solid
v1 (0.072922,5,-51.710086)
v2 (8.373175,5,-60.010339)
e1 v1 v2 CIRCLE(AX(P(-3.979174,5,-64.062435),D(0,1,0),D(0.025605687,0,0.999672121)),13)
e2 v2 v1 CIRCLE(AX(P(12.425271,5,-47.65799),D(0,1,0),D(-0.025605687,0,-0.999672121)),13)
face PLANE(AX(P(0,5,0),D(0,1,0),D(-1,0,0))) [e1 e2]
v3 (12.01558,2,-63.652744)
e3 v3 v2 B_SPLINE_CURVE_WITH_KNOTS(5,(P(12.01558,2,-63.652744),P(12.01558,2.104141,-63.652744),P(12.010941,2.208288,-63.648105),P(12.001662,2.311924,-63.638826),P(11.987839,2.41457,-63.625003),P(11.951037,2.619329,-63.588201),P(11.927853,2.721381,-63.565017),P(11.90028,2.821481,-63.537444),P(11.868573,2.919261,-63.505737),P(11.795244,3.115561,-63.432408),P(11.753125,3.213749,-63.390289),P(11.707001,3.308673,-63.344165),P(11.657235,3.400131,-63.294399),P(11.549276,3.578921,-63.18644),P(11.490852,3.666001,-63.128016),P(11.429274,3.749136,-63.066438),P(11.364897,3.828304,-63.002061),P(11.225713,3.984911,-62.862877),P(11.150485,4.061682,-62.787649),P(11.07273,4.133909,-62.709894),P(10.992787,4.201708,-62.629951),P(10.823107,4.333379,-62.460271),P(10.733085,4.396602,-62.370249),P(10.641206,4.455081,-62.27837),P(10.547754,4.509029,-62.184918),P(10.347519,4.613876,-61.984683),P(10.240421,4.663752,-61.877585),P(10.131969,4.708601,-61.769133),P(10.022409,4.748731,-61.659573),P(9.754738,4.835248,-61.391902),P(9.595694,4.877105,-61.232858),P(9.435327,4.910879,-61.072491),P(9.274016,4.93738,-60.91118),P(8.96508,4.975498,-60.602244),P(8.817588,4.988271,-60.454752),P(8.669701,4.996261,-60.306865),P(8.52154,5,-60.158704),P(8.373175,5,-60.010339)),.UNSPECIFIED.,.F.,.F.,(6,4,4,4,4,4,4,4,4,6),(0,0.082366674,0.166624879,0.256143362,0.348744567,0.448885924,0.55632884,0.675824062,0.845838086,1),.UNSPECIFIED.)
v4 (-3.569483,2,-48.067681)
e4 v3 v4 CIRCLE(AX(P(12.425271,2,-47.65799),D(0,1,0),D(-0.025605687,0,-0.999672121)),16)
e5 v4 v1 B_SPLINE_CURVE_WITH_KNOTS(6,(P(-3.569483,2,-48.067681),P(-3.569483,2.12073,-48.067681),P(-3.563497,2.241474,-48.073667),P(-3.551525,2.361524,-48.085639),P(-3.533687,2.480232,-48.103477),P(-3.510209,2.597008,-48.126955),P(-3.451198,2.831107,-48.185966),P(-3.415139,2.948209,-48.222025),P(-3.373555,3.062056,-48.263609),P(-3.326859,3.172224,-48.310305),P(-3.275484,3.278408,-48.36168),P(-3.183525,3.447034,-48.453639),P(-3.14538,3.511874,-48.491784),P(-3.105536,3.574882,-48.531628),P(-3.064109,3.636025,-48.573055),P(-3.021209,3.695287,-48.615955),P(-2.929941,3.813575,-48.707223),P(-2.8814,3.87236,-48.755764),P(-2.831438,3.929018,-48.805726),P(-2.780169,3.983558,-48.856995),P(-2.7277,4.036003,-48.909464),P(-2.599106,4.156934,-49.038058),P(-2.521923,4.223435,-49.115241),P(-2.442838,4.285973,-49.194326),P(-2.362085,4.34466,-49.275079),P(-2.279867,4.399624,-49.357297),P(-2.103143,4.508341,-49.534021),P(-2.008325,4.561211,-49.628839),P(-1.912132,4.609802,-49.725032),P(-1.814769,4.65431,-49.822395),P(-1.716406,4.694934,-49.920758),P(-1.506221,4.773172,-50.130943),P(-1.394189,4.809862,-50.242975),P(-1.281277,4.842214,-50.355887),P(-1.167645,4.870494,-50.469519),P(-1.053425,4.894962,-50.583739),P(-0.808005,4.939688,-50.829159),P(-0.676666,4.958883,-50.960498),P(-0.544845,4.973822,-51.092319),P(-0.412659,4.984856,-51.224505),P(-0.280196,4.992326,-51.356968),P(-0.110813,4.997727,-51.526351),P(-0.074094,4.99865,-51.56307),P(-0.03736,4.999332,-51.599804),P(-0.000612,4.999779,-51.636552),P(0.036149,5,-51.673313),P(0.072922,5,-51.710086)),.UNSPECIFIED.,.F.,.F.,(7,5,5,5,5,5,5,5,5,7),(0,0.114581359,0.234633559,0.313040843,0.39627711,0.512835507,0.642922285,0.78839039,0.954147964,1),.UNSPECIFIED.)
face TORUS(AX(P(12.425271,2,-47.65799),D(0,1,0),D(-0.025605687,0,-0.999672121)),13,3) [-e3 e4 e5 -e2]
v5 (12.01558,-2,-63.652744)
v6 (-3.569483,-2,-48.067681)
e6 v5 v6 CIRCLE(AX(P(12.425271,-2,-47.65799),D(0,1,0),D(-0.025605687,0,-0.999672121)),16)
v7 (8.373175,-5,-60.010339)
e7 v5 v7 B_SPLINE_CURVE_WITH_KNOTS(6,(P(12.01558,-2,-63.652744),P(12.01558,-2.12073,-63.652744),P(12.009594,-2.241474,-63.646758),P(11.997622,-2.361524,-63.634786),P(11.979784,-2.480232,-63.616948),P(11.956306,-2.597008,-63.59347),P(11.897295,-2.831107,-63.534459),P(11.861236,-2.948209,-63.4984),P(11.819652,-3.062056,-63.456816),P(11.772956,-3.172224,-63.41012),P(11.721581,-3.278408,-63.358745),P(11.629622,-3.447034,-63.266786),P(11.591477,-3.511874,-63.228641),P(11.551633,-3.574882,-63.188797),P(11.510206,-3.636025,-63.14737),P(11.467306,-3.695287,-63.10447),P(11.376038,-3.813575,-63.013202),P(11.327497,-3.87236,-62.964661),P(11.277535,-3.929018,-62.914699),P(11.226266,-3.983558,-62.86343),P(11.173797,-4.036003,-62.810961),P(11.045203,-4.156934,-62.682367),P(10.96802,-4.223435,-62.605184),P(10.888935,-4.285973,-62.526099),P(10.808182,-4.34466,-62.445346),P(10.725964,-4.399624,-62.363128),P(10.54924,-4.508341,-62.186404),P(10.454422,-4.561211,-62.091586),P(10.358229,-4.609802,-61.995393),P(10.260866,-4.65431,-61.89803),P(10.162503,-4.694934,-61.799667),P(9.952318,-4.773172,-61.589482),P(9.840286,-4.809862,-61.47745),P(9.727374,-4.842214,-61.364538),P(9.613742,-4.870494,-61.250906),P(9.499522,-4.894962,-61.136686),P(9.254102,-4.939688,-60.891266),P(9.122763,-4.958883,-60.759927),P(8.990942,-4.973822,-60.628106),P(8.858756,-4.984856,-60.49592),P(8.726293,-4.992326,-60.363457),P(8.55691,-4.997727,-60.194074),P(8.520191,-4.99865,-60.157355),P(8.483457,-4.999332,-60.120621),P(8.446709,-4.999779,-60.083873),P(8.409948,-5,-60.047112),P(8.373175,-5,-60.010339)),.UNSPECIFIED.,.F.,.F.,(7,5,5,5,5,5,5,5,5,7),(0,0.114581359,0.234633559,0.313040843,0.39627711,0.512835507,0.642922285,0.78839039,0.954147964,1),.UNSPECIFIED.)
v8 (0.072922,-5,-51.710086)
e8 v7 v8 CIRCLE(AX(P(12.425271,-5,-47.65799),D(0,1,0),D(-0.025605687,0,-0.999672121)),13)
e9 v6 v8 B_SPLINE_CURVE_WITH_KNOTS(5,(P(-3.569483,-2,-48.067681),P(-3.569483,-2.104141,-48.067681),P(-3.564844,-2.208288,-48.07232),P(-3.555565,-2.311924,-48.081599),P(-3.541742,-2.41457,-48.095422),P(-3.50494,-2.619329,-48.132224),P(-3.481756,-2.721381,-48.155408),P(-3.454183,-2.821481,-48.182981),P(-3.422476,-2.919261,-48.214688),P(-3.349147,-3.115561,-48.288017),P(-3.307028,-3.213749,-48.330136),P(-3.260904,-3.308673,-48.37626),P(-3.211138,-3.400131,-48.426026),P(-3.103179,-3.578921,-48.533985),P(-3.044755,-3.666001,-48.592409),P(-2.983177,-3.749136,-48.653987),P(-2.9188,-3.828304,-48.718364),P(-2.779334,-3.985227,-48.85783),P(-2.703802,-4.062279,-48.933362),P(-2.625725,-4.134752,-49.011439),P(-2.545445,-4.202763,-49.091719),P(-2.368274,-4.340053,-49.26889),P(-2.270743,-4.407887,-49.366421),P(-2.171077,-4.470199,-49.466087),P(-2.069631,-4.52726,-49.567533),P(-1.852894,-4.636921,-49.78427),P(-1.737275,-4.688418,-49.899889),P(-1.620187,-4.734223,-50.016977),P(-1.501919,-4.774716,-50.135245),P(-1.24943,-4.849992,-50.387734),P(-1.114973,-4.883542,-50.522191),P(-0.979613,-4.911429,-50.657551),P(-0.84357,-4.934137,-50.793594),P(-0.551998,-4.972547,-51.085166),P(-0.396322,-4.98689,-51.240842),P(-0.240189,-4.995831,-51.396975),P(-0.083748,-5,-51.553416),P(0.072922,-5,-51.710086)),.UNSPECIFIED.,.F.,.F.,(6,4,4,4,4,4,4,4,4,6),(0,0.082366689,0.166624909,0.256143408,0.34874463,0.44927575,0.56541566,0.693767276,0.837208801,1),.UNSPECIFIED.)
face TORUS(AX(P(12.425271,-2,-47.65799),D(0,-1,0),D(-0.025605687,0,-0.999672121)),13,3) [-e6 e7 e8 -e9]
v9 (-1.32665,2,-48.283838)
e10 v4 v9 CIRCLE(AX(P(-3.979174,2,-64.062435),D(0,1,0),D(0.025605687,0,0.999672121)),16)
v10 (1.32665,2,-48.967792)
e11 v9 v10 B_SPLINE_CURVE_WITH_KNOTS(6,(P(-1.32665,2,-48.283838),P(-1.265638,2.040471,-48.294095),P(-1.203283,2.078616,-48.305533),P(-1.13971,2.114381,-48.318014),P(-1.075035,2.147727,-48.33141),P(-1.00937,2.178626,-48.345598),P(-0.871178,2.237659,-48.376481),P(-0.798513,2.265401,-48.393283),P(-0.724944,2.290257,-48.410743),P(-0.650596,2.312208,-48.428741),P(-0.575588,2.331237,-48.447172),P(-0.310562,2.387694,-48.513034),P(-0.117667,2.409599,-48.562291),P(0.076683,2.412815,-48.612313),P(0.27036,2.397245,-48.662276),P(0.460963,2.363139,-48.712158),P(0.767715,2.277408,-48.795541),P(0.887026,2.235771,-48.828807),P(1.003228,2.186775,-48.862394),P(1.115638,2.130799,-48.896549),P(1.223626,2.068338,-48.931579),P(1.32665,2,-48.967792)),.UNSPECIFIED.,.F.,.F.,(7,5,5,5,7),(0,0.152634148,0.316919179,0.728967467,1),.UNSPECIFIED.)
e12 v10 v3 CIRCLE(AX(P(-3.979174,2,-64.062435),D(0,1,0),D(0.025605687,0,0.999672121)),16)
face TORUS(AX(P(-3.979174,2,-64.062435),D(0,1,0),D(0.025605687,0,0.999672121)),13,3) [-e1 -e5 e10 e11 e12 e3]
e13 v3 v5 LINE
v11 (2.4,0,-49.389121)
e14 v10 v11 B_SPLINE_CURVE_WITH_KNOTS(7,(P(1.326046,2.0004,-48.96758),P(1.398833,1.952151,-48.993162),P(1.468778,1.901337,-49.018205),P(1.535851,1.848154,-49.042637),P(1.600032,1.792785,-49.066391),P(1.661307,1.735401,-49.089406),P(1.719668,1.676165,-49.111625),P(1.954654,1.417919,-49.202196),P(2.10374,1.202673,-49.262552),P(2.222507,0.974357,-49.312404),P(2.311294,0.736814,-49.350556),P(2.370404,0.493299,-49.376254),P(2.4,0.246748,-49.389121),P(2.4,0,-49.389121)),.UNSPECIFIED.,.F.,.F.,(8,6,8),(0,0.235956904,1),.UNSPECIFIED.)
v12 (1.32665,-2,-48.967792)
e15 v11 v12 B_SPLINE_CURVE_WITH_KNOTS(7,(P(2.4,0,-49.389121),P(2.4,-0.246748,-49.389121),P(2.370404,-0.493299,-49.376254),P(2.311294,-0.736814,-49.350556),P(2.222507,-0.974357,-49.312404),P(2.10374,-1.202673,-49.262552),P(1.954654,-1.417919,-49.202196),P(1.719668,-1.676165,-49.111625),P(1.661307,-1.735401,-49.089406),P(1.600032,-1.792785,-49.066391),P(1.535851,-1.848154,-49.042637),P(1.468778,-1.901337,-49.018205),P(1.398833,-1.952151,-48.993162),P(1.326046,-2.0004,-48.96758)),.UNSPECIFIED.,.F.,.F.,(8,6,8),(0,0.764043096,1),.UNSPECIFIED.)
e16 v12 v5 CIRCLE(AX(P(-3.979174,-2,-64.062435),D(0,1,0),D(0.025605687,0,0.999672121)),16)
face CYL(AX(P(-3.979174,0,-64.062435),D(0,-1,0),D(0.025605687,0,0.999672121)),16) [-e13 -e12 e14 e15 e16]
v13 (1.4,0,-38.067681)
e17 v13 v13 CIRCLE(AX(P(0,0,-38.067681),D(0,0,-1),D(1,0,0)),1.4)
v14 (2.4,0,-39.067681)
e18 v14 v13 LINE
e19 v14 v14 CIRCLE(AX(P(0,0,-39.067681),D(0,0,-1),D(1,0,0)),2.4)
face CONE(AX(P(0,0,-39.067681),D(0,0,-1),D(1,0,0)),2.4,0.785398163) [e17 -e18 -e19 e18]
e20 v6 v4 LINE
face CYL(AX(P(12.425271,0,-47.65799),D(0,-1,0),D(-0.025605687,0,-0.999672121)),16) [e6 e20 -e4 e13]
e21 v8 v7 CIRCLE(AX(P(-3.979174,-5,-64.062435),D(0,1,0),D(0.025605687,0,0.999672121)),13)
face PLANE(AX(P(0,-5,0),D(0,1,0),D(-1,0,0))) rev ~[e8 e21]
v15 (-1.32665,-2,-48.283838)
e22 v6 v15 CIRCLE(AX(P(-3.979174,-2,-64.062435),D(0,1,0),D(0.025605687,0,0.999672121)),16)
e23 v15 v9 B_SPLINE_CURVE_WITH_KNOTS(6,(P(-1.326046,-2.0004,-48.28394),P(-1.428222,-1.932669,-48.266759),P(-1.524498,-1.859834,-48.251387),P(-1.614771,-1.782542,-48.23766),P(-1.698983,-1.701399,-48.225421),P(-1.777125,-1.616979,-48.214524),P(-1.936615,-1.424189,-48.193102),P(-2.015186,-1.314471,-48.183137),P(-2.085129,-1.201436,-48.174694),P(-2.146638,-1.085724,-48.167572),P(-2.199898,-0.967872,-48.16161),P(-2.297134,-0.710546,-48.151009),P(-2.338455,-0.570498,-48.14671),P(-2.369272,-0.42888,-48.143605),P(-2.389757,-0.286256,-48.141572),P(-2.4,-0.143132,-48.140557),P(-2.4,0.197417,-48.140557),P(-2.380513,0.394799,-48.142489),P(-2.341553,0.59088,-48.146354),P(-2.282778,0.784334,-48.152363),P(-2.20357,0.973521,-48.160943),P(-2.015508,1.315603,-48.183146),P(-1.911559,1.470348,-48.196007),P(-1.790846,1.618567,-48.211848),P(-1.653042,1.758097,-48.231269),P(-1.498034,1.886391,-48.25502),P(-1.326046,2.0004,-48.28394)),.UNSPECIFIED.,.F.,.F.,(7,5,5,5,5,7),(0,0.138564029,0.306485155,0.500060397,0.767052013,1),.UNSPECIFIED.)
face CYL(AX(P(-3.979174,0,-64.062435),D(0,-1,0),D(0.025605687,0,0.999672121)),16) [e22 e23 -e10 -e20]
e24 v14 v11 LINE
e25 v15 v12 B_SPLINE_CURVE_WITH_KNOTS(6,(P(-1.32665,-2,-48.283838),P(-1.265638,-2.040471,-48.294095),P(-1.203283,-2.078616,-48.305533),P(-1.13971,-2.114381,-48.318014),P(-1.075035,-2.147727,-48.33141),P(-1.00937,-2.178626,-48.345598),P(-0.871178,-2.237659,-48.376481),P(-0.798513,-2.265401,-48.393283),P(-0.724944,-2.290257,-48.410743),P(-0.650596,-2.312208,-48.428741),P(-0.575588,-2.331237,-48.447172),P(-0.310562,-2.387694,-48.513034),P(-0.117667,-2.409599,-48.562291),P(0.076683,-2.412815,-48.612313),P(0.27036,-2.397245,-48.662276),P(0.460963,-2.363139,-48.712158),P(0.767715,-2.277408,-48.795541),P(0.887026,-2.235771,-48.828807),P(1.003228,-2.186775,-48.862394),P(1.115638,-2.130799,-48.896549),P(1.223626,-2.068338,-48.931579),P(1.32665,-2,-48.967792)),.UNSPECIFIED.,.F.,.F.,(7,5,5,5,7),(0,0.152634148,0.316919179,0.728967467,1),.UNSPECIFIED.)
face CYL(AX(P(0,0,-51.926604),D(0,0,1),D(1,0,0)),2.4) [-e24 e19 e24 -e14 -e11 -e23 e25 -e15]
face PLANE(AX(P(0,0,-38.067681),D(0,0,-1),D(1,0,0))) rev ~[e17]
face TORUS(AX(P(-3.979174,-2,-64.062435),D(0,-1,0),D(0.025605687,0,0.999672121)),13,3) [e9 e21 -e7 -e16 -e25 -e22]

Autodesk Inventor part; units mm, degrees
ref_plane "YZ Plane" through (0, 0, 0) normal (1, 0, 0) x (0, 1, 0)
ref_plane "XZ Plane" through (0, 0, 0) normal (0, 1, 0) x (-1, 0, 0)
ref_plane "XY Plane" through (0, 0, 0) normal (0, 0, 1) x (1, 0, 0)
sketch "Sketch2" plane through (0, 0, 0) normal (0, 1, 0) x (-1, 0, 0)
  line L0 (0, 0) -> (-15.380673, 0) construction
  line L1 (0, 12) -> (0, -86.646063) construction
  circle A0 centre (0, 0) radius 2
  circle A1 centre (-12, 0) radius 10
  circle A2 centre (-23.313708, -11.313708) radius 6
  circle A3 centre (-16, -32.062435) radius 16
  line L2 (-16, -48.062435) -> (0, -48.062435)
  line L3 (-12, 10) -> (0, 10)
  line L4 (-12, 0) -> (-23.313708, -11.313708)
  arc A4 (-19.562803, 6.542477) -> (-31.877188, -34.041046) centre (19.892258, -27.589553) ccw
  line L5 (0, 0) -> (15.380673, 0) construction
  circle A5 centre (0, 0) radius 2
  circle A6 centre (12, 0) radius 10
  circle A7 centre (23.313708, -11.313708) radius 6
  circle A8 centre (16, -32.062435) radius 16
  line L6 (16, -48.062435) -> (0, -48.062435)
  line L7 (12, 10) -> (0, 10)
  line L8 (12, 0) -> (23.313708, -11.313708)
  arc A9 (31.877188, -34.041046) -> (19.562803, 6.542477) centre (-19.892258, -27.589553) ccw
  arc A10 (10.751933, -47.177256) -> (0, -45.834116) centre (2.223823, -71.738838) ccw
  arc A11 (0, 6.931712) -> (7.2, 8.772685) centre (0, 21.931712) ccw
  arc A12 (0, -45.834116) -> (-10.751933, -47.177256) centre (-2.223823, -71.738838) ccw
  arc A13 (-7.2, 8.772685) -> (0, 6.931712) centre (0, 21.931712) ccw
  line L9 (-23.313708, -11.313708) -> (-58.366086, -46.366086)
  line L10 (-12, 0) -> (-38.351414, 26.351414)
  line L11 (10.154637, -70.237898) -> (-38.67512, -21.408141)
  circle A14 centre (-36.041631, -24.041631) radius 16
  circle A15 centre (-12.425271, -47.65799) radius 16
  circle A16 centre (3.979174, -64.062435) radius 16
  line L12 (0, 10) -> (0, -48.062435)
  point P0 (3.569483, -48.067681)
  point P1 (-12.01558, -63.652744)
  point P2 (-7.2, 8.772685)
  point P3 (-29.089266, -9.631057)
  point P4 (-30.409272, -39.017496)
  point P5 (-10.751933, -47.177256)
  point P6 (-21.637972, -17.07495)
  point P7 (-21.319061, -16.972452)
  point P8 (-21.632358, -17.08657)
  point P9 (-29.07495, -9.637972)
  point P10 (-32.277182, -27.80608)
  point P11 (-31.595554, -28.487707)
  point P12 (0, -45.834116)
  point P13 (-28.928532, -9.198584)
  dimension "d0" = 4
  dimension "d1" = 20
  dimension "d2" = 12
  dimension "d3" = 32
  dimension "d4" = 135
  dimension "d6" = 26
  dimension "d7" = 15
  dimension "d8" = 90
  dimension "d12" = 34
  dimension "d13" = 32
  dimension "d14" = 32
  dimension "d15" = 32
sketch "Sketch9" plane through (0, 0, 0) normal (0, 1, 0) x (-1, 0, 0)
  point P0 (0, 0)
sketch "Sketch2 outline for Extrusion5" plane through (0, 0, 0) normal (0, 1, 0) x (-1, 0, 0)
  arc A0 (3.569483, -48.067681) -> (-12.01558, -63.652744) centre (3.979174, -64.062435) ccw
  arc A1 (-12.01558, -63.652744) -> (3.569483, -48.067681) centre (-12.425271, -47.65799) ccw
extrude "Extrusion5" add sketch "Sketch2 outline for Extrusion5" along normal mid plane 10
fillet "Fillet1" radius 3 4 edges at (7.3345, 5, -52.7487) (1.1116, 5, -58.9717) (7.3345, -5, -52.7487) (1.1116, -5, -58.9717)
sketch "Sketch11" plane through (0, 0, 0) normal (0, 1, 0) x (-1, 0, 0)
  line L0 (0, -51.926604) -> (-2.4, -51.926604)
  line L1 (-2.4, -51.926604) -> (-2.4, -38.067681)
  line L2 (-2.4, -38.067681) -> (0, -38.067681)
  line L3 (0, -38.067681) -> (0, -51.926604)
  arc A0 (-12.01558, -63.652744) -> (3.569483, -48.067681) centre (-12.425271, -47.65799) ccw construction
  line L4 (3.569483, -48.067681) -> (-7.561691, -48.067681)
  point P0 (0, 0)
  dimension "d48" = 10
  dimension "d49" = 4.8
  dimension "d50" = 0
revolve "Revolution3" add sketch "Sketch11" angle 360 about axis through (0, 0, -38.067681) along (0, 0, -1)
chamfer "Chamfer5" distance 1 angle 45 1 edges at (-2.4, 0, -38.0677)
sketch "Sketch5" plane through (0, 0, 0) normal (0, 1, 0) x (-1, 0, 0)
  line L0 (-23.313708, -11.313708) -> (-58.366086, -46.366086) construction
  circle A0 centre (-36.041631, -24.041631) radius 16
  line L1 (-36.041631, -24.041631) -> (-36.041631, 0)
  line L2 (0, 0) -> (0, -9.637972)
  line L3 (-29.07495, -9.637972) -> (29.07495, -9.637972) construction
  line L4 (-36.041631, -24.041631) -> (-36.041631, -40.041631)
  point P0 (-36.041631, -8.041631)
sketch "Sketch6" plane through (0, 0, 0) normal (0, 1, 0) x (-1, 0, 0)
  line L0 (40.788427, -34.041046) -> (-37.176167, -34.041046)
  line L1 (-37.176167, -34.041046) -> (-37.176167, -50.872651)
  line L2 (-37.176167, -50.872651) -> (40.788427, -50.872651)
  line L3 (40.788427, -50.872651) -> (40.788427, -34.041046)
  point P0 (0, 0)
  dimension "d34" = 45
  dimension "d35" = 2
sketch "Sketch3" plane through (0, 0, 0) normal (0, -1, 0) x (1, 0, 0)
  line L0 (-51.381118, -10) -> (56.260395, -10)
  line L1 (56.260395, -10) -> (56.260395, -25)
  line L2 (56.260395, -25) -> (-51.381118, -25)
  line L3 (-51.381118, -25) -> (-51.381118, -10)
  point P0 (0, 0)
  dimension "d22" = 15
  dimension "d23" = 10
properties part number "Apple_logo_red"
